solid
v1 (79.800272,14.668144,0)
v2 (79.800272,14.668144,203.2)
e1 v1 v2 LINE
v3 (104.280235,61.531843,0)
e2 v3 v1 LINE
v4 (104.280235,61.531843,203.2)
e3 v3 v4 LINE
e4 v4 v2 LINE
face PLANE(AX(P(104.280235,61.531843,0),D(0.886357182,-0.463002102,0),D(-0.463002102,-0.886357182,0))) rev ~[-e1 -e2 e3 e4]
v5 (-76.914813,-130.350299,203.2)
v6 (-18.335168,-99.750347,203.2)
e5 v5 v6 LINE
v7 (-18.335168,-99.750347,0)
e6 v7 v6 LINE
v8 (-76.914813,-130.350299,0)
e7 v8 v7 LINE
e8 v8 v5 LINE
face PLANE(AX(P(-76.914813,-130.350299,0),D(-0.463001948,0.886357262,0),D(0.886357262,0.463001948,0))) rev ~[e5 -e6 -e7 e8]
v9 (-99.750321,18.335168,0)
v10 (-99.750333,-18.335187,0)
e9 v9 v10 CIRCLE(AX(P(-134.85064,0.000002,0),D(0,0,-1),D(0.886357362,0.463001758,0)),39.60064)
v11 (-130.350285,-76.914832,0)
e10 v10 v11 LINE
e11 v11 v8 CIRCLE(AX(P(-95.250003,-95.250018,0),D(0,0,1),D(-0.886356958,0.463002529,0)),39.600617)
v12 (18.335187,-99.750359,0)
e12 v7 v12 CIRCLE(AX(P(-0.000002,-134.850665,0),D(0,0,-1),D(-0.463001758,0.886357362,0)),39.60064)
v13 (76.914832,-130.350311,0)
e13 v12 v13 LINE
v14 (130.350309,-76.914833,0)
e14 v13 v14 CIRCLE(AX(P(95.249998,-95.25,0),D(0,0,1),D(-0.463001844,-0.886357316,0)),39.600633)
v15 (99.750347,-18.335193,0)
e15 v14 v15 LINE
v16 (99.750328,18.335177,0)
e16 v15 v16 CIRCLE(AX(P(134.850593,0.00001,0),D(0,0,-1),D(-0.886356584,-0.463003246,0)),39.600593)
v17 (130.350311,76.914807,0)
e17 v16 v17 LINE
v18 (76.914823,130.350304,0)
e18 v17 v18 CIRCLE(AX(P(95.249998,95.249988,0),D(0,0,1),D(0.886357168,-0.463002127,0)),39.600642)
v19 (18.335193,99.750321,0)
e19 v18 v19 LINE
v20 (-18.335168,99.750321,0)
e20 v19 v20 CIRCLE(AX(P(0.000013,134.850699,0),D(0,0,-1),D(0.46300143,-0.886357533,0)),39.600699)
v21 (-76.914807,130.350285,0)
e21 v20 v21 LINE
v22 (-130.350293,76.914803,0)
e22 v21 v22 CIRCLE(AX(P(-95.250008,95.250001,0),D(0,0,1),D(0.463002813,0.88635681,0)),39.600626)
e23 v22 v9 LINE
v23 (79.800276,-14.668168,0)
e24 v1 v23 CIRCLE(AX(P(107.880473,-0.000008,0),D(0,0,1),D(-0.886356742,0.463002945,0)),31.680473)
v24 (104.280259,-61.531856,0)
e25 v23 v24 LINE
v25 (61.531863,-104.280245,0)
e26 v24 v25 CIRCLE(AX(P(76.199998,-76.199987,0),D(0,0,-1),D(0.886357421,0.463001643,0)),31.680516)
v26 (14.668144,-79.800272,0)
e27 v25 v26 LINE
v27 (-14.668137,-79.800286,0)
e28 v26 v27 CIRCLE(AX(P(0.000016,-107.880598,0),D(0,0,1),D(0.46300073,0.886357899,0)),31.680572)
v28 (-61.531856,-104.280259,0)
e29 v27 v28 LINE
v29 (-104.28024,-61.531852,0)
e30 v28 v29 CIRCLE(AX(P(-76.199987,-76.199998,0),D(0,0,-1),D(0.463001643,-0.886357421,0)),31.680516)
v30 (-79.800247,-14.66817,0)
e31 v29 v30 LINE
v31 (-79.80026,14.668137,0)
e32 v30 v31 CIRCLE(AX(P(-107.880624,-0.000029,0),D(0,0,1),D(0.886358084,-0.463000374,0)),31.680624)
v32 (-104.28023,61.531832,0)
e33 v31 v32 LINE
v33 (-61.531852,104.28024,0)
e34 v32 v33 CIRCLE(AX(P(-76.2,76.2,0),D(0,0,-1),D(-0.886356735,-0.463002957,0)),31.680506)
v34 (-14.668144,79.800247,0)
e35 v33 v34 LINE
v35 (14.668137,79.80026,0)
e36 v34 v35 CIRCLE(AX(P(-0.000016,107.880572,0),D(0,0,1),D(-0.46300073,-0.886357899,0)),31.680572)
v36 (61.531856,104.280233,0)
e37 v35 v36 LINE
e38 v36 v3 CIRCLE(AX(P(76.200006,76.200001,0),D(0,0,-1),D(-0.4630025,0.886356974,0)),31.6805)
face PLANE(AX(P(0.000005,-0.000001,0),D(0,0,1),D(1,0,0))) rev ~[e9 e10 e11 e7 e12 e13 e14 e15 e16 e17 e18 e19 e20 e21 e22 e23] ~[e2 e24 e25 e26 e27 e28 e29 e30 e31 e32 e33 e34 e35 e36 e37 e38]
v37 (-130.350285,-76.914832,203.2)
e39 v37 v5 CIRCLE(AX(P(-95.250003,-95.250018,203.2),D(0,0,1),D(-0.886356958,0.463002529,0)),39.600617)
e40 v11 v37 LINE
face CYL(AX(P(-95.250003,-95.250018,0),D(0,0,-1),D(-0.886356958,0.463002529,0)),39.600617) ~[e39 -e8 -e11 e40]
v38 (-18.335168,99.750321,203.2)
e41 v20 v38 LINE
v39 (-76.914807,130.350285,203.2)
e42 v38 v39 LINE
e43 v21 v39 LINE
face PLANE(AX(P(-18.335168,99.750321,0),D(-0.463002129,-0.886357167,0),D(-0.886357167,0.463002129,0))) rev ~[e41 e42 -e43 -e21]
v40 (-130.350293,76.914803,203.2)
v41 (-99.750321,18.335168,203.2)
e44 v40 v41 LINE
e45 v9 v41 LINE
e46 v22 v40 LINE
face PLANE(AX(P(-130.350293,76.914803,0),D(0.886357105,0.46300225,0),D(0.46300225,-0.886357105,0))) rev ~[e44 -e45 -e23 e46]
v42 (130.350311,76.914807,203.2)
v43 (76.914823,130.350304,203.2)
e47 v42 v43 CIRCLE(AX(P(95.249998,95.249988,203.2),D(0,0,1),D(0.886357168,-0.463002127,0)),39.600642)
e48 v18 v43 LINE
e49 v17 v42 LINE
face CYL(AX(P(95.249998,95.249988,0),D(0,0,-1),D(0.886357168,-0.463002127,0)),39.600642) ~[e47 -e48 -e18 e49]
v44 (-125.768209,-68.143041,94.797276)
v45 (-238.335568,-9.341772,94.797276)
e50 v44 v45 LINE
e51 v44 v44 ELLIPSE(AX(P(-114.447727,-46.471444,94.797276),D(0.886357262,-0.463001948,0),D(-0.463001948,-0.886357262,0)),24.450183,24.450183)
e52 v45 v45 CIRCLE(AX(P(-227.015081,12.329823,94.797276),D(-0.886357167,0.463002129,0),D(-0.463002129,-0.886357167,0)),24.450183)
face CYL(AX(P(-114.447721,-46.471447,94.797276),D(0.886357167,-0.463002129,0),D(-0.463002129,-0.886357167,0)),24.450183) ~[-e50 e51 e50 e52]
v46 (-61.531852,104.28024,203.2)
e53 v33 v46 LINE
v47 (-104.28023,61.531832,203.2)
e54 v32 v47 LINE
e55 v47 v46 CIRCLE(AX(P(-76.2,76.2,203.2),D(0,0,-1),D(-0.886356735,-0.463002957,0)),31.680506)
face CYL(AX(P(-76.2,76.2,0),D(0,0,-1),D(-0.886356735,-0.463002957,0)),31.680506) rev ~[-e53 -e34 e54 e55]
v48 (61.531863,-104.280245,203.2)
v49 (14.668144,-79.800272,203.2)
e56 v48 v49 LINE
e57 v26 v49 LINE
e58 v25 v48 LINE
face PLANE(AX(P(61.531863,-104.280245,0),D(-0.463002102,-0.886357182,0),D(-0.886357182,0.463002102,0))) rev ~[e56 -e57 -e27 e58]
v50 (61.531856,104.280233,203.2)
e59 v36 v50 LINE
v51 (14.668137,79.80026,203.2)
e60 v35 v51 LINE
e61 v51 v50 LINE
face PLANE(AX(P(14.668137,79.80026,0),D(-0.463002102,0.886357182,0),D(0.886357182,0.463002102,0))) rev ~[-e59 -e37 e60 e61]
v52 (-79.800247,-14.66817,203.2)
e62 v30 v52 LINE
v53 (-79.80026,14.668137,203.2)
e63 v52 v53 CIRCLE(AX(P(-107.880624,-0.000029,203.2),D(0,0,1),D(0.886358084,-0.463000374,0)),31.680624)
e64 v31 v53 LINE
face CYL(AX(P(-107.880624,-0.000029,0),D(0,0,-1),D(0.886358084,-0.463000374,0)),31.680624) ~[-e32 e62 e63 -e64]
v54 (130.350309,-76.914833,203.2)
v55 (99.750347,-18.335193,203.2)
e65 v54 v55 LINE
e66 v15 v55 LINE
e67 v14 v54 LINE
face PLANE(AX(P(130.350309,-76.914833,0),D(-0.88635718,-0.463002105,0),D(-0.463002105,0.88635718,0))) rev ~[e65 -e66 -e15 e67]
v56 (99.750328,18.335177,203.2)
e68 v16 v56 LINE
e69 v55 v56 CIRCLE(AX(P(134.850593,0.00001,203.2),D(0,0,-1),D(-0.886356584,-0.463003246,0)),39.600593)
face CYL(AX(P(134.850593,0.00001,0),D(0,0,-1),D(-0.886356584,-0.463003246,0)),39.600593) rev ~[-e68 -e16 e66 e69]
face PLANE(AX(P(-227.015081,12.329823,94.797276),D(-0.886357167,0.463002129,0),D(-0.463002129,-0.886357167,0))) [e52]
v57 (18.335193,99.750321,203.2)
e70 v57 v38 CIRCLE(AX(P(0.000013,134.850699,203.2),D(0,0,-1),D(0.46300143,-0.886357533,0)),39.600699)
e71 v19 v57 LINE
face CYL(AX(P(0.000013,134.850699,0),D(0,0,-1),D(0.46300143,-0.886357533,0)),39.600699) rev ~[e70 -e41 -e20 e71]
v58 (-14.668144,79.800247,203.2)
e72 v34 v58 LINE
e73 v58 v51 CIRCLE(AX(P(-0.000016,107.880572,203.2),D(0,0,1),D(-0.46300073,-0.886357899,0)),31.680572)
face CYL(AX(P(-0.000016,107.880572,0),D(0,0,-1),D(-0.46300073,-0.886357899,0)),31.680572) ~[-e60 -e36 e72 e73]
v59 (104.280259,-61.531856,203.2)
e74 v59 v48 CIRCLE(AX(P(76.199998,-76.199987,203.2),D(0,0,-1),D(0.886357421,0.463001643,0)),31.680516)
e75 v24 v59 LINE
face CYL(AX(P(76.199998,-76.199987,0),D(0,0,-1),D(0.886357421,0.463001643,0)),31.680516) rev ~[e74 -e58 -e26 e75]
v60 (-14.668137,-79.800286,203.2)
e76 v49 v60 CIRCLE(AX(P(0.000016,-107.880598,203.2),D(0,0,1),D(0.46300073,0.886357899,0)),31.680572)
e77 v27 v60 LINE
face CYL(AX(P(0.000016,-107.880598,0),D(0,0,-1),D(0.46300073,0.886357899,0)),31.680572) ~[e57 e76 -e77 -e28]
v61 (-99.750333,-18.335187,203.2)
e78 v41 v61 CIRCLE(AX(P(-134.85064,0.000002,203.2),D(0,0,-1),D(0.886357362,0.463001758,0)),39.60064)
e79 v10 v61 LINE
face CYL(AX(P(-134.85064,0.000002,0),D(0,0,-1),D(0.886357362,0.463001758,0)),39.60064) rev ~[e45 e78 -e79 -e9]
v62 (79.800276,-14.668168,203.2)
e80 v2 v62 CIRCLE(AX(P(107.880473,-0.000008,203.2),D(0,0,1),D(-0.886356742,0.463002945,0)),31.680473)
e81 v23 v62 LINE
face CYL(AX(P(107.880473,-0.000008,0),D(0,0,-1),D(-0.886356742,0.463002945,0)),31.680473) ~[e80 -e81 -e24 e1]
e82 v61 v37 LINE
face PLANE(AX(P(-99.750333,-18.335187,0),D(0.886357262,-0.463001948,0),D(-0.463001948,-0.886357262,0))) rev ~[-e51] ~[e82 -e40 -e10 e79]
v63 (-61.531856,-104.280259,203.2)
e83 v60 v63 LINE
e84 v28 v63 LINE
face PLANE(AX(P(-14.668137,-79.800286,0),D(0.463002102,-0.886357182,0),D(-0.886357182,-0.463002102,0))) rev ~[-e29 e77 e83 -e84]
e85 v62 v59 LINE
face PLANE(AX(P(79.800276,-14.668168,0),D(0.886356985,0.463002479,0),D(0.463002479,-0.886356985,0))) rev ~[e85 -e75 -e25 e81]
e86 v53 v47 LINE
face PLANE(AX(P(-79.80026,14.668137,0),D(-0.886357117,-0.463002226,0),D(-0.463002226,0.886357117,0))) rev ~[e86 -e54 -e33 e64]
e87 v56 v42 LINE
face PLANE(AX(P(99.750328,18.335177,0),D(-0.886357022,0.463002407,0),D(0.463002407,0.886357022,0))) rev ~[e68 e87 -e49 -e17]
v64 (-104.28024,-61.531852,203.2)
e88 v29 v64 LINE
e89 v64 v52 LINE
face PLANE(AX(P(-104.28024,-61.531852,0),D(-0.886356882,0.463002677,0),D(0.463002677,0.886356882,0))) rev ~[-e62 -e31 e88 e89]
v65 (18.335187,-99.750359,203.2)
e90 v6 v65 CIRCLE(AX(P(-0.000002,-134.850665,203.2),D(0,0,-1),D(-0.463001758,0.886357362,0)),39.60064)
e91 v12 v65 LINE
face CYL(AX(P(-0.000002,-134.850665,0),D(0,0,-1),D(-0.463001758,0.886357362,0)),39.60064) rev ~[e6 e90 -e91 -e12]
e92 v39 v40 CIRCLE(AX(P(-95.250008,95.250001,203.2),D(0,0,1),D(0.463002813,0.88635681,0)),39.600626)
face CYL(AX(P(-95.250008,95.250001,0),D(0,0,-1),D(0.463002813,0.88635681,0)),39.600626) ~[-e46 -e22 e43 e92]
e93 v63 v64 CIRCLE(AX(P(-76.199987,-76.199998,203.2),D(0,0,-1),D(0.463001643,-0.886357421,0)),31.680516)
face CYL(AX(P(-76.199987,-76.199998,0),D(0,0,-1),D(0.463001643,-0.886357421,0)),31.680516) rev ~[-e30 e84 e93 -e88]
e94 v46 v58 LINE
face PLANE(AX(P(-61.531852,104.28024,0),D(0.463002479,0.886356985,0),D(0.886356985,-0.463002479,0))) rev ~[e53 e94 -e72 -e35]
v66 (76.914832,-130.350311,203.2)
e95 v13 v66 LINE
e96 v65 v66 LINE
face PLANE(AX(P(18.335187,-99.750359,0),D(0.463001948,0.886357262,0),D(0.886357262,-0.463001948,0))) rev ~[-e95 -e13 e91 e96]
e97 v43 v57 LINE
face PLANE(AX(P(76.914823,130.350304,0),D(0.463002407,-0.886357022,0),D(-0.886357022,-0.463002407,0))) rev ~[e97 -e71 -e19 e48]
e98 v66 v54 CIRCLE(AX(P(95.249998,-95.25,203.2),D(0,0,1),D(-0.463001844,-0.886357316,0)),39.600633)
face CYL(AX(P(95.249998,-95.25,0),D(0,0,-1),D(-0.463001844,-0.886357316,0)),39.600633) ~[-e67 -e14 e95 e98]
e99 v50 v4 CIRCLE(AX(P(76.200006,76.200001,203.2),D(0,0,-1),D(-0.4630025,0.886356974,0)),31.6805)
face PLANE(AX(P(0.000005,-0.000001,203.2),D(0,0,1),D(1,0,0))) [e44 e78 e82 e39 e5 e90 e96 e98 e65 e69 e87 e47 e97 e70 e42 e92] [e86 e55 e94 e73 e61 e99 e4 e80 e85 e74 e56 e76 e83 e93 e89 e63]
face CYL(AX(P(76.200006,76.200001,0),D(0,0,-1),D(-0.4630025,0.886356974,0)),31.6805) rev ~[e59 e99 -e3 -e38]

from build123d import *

# Parameters (mm, degrees)
F1_DEPTH = 203.2
F2_R     = 24.4501828069
F3_DEPTH = 127


# Not quite as in the source:
# - ends of sketch curves that miss each other by under 0.0002 mm in the source are joined
# - the program builds the solid bodies; features that only make, move or delete a surface that nothing else refers to are left out


with BuildPart() as f1:
    # F0 (on Top) → F1 (new body)
    with BuildSketch(Plane.XY):
        with BuildLine():
            Line((-18.3351678, 99.7503212), (-76.9148068, 130.3502854))
            ThreePointArc((-76.9148068, 130.3502854), (-123.2518754265, 123.2518754265), (-130.3502933453, 76.9148026497))
            Line((-130.3502933453, 76.9148026497), (-99.7503212, 18.3351678))
            ThreePointArc((-99.7503212, 18.3351678), (-95.25, -1.12567e-05), (-99.7503332097, -18.3351869265))
            Line((-99.7503332097, -18.3351869265), (-130.3502854, -76.9148322))
            ThreePointArc((-130.3502854, -76.9148322), (-123.2518716246, -123.2518792283), (-76.9148130735, -130.3502987903))
            Line((-76.9148130735, -130.3502987903), (-18.3351678, -99.7503466))
            ThreePointArc((-18.3351678, -99.7503466), (1.12567e-05, -95.2500254), (18.3351869265, -99.7503586097))
            Line((18.3351869265, -99.7503586097), (76.9148322, -130.3503108))
            ThreePointArc((76.9148322, -130.3503108), (123.2518754265, -123.2518754265), (130.3503092141, -76.9148330284))
            Line((130.3503092141, -76.9148330284), (99.7503466, -18.3351932))
            ThreePointArc((99.7503466, -18.3351932), (95.25, -1.12567e-05), (99.7503282309, 18.3351773954))
            Line((99.7503282309, 18.3351773954), (130.3503108, 76.9148068))
            ThreePointArc((130.3503108, 76.9148068), (123.2518792283, 123.2518716246), (76.9148226046, 130.3503037691))
            Line((76.9148226046, 130.3503037691), (18.3351932, 99.7503212))
            ThreePointArc((18.3351932, 99.7503212), (1.12567e-05, 95.25), (-18.3351678, 99.7503212))
        make_face()
        with BuildLine():
            ThreePointArc((-104.2802295109, 61.5318322315), (-98.6015083009, 98.6014923815), (-61.5318521865, 104.2802399347))
            Line((-61.5318521865, 104.2802399347), (-14.6681444, 79.8002468))
            ThreePointArc((-14.6681444, 79.8002468), (0, 76.2), (14.6681373897, 79.8002602202))
            Line((14.6681373897, 79.8002602202), (61.5318556, 104.2802334))
            ThreePointArc((61.5318556, 104.2802334), (98.601504143, 98.6014965393), (104.280234956, 61.5318426553))
            Line((104.280234956, 61.5318426553), (79.8002722, 14.6681444))
            ThreePointArc((79.8002722, 14.6681444), (76.2, -1.12567e-05), (79.8002760891, -14.6681677685))
            Line((79.8002760891, -14.6681677685), (104.2802588, -61.5318556))
            ThreePointArc((104.2802588, -61.5318556), (98.6015003412, -98.6015003412), (61.5318626103, -104.2802453798))
            Line((61.5318626103, -104.2802453798), (14.6681444, -79.8002722))
            ThreePointArc((14.6681444, -79.8002722), (0, -76.2000254), (-14.6681373897, -79.8002856202))
            Line((-14.6681373897, -79.8002856202), (-61.5318556, -104.2802588))
            ThreePointArc((-61.5318556, -104.2802588), (-98.6015044991, -98.6014961833), (-104.2802399347, -61.5318521865))
            Line((-104.2802399347, -61.5318521865), (-79.8002468, -14.6681698))
            ThreePointArc((-79.8002468, -14.6681698), (-76.2, -1.12567e-05), (-79.8002602202, 14.6681373897))
            Line((-79.8002602202, 14.6681373897), (-104.2802295109, 61.5318322315))
        make_face(mode=Mode.SUBTRACT)
    extrude(amount=F1_DEPTH)

    # F2 (on face) → F3 (join)
    with BuildSketch(Plane(origin=(-70.8422549592, 37.0055279036, 0), x_dir=(-0.4630021293, -0.8863571674, 0), z_dir=(-0.8863571674, 0.4630021293, 0))):
        with Locations((94.1798388958, 94.7972759604)):
            Circle(F2_R)
    extrude(amount=F3_DEPTH)


solid = f1.part
